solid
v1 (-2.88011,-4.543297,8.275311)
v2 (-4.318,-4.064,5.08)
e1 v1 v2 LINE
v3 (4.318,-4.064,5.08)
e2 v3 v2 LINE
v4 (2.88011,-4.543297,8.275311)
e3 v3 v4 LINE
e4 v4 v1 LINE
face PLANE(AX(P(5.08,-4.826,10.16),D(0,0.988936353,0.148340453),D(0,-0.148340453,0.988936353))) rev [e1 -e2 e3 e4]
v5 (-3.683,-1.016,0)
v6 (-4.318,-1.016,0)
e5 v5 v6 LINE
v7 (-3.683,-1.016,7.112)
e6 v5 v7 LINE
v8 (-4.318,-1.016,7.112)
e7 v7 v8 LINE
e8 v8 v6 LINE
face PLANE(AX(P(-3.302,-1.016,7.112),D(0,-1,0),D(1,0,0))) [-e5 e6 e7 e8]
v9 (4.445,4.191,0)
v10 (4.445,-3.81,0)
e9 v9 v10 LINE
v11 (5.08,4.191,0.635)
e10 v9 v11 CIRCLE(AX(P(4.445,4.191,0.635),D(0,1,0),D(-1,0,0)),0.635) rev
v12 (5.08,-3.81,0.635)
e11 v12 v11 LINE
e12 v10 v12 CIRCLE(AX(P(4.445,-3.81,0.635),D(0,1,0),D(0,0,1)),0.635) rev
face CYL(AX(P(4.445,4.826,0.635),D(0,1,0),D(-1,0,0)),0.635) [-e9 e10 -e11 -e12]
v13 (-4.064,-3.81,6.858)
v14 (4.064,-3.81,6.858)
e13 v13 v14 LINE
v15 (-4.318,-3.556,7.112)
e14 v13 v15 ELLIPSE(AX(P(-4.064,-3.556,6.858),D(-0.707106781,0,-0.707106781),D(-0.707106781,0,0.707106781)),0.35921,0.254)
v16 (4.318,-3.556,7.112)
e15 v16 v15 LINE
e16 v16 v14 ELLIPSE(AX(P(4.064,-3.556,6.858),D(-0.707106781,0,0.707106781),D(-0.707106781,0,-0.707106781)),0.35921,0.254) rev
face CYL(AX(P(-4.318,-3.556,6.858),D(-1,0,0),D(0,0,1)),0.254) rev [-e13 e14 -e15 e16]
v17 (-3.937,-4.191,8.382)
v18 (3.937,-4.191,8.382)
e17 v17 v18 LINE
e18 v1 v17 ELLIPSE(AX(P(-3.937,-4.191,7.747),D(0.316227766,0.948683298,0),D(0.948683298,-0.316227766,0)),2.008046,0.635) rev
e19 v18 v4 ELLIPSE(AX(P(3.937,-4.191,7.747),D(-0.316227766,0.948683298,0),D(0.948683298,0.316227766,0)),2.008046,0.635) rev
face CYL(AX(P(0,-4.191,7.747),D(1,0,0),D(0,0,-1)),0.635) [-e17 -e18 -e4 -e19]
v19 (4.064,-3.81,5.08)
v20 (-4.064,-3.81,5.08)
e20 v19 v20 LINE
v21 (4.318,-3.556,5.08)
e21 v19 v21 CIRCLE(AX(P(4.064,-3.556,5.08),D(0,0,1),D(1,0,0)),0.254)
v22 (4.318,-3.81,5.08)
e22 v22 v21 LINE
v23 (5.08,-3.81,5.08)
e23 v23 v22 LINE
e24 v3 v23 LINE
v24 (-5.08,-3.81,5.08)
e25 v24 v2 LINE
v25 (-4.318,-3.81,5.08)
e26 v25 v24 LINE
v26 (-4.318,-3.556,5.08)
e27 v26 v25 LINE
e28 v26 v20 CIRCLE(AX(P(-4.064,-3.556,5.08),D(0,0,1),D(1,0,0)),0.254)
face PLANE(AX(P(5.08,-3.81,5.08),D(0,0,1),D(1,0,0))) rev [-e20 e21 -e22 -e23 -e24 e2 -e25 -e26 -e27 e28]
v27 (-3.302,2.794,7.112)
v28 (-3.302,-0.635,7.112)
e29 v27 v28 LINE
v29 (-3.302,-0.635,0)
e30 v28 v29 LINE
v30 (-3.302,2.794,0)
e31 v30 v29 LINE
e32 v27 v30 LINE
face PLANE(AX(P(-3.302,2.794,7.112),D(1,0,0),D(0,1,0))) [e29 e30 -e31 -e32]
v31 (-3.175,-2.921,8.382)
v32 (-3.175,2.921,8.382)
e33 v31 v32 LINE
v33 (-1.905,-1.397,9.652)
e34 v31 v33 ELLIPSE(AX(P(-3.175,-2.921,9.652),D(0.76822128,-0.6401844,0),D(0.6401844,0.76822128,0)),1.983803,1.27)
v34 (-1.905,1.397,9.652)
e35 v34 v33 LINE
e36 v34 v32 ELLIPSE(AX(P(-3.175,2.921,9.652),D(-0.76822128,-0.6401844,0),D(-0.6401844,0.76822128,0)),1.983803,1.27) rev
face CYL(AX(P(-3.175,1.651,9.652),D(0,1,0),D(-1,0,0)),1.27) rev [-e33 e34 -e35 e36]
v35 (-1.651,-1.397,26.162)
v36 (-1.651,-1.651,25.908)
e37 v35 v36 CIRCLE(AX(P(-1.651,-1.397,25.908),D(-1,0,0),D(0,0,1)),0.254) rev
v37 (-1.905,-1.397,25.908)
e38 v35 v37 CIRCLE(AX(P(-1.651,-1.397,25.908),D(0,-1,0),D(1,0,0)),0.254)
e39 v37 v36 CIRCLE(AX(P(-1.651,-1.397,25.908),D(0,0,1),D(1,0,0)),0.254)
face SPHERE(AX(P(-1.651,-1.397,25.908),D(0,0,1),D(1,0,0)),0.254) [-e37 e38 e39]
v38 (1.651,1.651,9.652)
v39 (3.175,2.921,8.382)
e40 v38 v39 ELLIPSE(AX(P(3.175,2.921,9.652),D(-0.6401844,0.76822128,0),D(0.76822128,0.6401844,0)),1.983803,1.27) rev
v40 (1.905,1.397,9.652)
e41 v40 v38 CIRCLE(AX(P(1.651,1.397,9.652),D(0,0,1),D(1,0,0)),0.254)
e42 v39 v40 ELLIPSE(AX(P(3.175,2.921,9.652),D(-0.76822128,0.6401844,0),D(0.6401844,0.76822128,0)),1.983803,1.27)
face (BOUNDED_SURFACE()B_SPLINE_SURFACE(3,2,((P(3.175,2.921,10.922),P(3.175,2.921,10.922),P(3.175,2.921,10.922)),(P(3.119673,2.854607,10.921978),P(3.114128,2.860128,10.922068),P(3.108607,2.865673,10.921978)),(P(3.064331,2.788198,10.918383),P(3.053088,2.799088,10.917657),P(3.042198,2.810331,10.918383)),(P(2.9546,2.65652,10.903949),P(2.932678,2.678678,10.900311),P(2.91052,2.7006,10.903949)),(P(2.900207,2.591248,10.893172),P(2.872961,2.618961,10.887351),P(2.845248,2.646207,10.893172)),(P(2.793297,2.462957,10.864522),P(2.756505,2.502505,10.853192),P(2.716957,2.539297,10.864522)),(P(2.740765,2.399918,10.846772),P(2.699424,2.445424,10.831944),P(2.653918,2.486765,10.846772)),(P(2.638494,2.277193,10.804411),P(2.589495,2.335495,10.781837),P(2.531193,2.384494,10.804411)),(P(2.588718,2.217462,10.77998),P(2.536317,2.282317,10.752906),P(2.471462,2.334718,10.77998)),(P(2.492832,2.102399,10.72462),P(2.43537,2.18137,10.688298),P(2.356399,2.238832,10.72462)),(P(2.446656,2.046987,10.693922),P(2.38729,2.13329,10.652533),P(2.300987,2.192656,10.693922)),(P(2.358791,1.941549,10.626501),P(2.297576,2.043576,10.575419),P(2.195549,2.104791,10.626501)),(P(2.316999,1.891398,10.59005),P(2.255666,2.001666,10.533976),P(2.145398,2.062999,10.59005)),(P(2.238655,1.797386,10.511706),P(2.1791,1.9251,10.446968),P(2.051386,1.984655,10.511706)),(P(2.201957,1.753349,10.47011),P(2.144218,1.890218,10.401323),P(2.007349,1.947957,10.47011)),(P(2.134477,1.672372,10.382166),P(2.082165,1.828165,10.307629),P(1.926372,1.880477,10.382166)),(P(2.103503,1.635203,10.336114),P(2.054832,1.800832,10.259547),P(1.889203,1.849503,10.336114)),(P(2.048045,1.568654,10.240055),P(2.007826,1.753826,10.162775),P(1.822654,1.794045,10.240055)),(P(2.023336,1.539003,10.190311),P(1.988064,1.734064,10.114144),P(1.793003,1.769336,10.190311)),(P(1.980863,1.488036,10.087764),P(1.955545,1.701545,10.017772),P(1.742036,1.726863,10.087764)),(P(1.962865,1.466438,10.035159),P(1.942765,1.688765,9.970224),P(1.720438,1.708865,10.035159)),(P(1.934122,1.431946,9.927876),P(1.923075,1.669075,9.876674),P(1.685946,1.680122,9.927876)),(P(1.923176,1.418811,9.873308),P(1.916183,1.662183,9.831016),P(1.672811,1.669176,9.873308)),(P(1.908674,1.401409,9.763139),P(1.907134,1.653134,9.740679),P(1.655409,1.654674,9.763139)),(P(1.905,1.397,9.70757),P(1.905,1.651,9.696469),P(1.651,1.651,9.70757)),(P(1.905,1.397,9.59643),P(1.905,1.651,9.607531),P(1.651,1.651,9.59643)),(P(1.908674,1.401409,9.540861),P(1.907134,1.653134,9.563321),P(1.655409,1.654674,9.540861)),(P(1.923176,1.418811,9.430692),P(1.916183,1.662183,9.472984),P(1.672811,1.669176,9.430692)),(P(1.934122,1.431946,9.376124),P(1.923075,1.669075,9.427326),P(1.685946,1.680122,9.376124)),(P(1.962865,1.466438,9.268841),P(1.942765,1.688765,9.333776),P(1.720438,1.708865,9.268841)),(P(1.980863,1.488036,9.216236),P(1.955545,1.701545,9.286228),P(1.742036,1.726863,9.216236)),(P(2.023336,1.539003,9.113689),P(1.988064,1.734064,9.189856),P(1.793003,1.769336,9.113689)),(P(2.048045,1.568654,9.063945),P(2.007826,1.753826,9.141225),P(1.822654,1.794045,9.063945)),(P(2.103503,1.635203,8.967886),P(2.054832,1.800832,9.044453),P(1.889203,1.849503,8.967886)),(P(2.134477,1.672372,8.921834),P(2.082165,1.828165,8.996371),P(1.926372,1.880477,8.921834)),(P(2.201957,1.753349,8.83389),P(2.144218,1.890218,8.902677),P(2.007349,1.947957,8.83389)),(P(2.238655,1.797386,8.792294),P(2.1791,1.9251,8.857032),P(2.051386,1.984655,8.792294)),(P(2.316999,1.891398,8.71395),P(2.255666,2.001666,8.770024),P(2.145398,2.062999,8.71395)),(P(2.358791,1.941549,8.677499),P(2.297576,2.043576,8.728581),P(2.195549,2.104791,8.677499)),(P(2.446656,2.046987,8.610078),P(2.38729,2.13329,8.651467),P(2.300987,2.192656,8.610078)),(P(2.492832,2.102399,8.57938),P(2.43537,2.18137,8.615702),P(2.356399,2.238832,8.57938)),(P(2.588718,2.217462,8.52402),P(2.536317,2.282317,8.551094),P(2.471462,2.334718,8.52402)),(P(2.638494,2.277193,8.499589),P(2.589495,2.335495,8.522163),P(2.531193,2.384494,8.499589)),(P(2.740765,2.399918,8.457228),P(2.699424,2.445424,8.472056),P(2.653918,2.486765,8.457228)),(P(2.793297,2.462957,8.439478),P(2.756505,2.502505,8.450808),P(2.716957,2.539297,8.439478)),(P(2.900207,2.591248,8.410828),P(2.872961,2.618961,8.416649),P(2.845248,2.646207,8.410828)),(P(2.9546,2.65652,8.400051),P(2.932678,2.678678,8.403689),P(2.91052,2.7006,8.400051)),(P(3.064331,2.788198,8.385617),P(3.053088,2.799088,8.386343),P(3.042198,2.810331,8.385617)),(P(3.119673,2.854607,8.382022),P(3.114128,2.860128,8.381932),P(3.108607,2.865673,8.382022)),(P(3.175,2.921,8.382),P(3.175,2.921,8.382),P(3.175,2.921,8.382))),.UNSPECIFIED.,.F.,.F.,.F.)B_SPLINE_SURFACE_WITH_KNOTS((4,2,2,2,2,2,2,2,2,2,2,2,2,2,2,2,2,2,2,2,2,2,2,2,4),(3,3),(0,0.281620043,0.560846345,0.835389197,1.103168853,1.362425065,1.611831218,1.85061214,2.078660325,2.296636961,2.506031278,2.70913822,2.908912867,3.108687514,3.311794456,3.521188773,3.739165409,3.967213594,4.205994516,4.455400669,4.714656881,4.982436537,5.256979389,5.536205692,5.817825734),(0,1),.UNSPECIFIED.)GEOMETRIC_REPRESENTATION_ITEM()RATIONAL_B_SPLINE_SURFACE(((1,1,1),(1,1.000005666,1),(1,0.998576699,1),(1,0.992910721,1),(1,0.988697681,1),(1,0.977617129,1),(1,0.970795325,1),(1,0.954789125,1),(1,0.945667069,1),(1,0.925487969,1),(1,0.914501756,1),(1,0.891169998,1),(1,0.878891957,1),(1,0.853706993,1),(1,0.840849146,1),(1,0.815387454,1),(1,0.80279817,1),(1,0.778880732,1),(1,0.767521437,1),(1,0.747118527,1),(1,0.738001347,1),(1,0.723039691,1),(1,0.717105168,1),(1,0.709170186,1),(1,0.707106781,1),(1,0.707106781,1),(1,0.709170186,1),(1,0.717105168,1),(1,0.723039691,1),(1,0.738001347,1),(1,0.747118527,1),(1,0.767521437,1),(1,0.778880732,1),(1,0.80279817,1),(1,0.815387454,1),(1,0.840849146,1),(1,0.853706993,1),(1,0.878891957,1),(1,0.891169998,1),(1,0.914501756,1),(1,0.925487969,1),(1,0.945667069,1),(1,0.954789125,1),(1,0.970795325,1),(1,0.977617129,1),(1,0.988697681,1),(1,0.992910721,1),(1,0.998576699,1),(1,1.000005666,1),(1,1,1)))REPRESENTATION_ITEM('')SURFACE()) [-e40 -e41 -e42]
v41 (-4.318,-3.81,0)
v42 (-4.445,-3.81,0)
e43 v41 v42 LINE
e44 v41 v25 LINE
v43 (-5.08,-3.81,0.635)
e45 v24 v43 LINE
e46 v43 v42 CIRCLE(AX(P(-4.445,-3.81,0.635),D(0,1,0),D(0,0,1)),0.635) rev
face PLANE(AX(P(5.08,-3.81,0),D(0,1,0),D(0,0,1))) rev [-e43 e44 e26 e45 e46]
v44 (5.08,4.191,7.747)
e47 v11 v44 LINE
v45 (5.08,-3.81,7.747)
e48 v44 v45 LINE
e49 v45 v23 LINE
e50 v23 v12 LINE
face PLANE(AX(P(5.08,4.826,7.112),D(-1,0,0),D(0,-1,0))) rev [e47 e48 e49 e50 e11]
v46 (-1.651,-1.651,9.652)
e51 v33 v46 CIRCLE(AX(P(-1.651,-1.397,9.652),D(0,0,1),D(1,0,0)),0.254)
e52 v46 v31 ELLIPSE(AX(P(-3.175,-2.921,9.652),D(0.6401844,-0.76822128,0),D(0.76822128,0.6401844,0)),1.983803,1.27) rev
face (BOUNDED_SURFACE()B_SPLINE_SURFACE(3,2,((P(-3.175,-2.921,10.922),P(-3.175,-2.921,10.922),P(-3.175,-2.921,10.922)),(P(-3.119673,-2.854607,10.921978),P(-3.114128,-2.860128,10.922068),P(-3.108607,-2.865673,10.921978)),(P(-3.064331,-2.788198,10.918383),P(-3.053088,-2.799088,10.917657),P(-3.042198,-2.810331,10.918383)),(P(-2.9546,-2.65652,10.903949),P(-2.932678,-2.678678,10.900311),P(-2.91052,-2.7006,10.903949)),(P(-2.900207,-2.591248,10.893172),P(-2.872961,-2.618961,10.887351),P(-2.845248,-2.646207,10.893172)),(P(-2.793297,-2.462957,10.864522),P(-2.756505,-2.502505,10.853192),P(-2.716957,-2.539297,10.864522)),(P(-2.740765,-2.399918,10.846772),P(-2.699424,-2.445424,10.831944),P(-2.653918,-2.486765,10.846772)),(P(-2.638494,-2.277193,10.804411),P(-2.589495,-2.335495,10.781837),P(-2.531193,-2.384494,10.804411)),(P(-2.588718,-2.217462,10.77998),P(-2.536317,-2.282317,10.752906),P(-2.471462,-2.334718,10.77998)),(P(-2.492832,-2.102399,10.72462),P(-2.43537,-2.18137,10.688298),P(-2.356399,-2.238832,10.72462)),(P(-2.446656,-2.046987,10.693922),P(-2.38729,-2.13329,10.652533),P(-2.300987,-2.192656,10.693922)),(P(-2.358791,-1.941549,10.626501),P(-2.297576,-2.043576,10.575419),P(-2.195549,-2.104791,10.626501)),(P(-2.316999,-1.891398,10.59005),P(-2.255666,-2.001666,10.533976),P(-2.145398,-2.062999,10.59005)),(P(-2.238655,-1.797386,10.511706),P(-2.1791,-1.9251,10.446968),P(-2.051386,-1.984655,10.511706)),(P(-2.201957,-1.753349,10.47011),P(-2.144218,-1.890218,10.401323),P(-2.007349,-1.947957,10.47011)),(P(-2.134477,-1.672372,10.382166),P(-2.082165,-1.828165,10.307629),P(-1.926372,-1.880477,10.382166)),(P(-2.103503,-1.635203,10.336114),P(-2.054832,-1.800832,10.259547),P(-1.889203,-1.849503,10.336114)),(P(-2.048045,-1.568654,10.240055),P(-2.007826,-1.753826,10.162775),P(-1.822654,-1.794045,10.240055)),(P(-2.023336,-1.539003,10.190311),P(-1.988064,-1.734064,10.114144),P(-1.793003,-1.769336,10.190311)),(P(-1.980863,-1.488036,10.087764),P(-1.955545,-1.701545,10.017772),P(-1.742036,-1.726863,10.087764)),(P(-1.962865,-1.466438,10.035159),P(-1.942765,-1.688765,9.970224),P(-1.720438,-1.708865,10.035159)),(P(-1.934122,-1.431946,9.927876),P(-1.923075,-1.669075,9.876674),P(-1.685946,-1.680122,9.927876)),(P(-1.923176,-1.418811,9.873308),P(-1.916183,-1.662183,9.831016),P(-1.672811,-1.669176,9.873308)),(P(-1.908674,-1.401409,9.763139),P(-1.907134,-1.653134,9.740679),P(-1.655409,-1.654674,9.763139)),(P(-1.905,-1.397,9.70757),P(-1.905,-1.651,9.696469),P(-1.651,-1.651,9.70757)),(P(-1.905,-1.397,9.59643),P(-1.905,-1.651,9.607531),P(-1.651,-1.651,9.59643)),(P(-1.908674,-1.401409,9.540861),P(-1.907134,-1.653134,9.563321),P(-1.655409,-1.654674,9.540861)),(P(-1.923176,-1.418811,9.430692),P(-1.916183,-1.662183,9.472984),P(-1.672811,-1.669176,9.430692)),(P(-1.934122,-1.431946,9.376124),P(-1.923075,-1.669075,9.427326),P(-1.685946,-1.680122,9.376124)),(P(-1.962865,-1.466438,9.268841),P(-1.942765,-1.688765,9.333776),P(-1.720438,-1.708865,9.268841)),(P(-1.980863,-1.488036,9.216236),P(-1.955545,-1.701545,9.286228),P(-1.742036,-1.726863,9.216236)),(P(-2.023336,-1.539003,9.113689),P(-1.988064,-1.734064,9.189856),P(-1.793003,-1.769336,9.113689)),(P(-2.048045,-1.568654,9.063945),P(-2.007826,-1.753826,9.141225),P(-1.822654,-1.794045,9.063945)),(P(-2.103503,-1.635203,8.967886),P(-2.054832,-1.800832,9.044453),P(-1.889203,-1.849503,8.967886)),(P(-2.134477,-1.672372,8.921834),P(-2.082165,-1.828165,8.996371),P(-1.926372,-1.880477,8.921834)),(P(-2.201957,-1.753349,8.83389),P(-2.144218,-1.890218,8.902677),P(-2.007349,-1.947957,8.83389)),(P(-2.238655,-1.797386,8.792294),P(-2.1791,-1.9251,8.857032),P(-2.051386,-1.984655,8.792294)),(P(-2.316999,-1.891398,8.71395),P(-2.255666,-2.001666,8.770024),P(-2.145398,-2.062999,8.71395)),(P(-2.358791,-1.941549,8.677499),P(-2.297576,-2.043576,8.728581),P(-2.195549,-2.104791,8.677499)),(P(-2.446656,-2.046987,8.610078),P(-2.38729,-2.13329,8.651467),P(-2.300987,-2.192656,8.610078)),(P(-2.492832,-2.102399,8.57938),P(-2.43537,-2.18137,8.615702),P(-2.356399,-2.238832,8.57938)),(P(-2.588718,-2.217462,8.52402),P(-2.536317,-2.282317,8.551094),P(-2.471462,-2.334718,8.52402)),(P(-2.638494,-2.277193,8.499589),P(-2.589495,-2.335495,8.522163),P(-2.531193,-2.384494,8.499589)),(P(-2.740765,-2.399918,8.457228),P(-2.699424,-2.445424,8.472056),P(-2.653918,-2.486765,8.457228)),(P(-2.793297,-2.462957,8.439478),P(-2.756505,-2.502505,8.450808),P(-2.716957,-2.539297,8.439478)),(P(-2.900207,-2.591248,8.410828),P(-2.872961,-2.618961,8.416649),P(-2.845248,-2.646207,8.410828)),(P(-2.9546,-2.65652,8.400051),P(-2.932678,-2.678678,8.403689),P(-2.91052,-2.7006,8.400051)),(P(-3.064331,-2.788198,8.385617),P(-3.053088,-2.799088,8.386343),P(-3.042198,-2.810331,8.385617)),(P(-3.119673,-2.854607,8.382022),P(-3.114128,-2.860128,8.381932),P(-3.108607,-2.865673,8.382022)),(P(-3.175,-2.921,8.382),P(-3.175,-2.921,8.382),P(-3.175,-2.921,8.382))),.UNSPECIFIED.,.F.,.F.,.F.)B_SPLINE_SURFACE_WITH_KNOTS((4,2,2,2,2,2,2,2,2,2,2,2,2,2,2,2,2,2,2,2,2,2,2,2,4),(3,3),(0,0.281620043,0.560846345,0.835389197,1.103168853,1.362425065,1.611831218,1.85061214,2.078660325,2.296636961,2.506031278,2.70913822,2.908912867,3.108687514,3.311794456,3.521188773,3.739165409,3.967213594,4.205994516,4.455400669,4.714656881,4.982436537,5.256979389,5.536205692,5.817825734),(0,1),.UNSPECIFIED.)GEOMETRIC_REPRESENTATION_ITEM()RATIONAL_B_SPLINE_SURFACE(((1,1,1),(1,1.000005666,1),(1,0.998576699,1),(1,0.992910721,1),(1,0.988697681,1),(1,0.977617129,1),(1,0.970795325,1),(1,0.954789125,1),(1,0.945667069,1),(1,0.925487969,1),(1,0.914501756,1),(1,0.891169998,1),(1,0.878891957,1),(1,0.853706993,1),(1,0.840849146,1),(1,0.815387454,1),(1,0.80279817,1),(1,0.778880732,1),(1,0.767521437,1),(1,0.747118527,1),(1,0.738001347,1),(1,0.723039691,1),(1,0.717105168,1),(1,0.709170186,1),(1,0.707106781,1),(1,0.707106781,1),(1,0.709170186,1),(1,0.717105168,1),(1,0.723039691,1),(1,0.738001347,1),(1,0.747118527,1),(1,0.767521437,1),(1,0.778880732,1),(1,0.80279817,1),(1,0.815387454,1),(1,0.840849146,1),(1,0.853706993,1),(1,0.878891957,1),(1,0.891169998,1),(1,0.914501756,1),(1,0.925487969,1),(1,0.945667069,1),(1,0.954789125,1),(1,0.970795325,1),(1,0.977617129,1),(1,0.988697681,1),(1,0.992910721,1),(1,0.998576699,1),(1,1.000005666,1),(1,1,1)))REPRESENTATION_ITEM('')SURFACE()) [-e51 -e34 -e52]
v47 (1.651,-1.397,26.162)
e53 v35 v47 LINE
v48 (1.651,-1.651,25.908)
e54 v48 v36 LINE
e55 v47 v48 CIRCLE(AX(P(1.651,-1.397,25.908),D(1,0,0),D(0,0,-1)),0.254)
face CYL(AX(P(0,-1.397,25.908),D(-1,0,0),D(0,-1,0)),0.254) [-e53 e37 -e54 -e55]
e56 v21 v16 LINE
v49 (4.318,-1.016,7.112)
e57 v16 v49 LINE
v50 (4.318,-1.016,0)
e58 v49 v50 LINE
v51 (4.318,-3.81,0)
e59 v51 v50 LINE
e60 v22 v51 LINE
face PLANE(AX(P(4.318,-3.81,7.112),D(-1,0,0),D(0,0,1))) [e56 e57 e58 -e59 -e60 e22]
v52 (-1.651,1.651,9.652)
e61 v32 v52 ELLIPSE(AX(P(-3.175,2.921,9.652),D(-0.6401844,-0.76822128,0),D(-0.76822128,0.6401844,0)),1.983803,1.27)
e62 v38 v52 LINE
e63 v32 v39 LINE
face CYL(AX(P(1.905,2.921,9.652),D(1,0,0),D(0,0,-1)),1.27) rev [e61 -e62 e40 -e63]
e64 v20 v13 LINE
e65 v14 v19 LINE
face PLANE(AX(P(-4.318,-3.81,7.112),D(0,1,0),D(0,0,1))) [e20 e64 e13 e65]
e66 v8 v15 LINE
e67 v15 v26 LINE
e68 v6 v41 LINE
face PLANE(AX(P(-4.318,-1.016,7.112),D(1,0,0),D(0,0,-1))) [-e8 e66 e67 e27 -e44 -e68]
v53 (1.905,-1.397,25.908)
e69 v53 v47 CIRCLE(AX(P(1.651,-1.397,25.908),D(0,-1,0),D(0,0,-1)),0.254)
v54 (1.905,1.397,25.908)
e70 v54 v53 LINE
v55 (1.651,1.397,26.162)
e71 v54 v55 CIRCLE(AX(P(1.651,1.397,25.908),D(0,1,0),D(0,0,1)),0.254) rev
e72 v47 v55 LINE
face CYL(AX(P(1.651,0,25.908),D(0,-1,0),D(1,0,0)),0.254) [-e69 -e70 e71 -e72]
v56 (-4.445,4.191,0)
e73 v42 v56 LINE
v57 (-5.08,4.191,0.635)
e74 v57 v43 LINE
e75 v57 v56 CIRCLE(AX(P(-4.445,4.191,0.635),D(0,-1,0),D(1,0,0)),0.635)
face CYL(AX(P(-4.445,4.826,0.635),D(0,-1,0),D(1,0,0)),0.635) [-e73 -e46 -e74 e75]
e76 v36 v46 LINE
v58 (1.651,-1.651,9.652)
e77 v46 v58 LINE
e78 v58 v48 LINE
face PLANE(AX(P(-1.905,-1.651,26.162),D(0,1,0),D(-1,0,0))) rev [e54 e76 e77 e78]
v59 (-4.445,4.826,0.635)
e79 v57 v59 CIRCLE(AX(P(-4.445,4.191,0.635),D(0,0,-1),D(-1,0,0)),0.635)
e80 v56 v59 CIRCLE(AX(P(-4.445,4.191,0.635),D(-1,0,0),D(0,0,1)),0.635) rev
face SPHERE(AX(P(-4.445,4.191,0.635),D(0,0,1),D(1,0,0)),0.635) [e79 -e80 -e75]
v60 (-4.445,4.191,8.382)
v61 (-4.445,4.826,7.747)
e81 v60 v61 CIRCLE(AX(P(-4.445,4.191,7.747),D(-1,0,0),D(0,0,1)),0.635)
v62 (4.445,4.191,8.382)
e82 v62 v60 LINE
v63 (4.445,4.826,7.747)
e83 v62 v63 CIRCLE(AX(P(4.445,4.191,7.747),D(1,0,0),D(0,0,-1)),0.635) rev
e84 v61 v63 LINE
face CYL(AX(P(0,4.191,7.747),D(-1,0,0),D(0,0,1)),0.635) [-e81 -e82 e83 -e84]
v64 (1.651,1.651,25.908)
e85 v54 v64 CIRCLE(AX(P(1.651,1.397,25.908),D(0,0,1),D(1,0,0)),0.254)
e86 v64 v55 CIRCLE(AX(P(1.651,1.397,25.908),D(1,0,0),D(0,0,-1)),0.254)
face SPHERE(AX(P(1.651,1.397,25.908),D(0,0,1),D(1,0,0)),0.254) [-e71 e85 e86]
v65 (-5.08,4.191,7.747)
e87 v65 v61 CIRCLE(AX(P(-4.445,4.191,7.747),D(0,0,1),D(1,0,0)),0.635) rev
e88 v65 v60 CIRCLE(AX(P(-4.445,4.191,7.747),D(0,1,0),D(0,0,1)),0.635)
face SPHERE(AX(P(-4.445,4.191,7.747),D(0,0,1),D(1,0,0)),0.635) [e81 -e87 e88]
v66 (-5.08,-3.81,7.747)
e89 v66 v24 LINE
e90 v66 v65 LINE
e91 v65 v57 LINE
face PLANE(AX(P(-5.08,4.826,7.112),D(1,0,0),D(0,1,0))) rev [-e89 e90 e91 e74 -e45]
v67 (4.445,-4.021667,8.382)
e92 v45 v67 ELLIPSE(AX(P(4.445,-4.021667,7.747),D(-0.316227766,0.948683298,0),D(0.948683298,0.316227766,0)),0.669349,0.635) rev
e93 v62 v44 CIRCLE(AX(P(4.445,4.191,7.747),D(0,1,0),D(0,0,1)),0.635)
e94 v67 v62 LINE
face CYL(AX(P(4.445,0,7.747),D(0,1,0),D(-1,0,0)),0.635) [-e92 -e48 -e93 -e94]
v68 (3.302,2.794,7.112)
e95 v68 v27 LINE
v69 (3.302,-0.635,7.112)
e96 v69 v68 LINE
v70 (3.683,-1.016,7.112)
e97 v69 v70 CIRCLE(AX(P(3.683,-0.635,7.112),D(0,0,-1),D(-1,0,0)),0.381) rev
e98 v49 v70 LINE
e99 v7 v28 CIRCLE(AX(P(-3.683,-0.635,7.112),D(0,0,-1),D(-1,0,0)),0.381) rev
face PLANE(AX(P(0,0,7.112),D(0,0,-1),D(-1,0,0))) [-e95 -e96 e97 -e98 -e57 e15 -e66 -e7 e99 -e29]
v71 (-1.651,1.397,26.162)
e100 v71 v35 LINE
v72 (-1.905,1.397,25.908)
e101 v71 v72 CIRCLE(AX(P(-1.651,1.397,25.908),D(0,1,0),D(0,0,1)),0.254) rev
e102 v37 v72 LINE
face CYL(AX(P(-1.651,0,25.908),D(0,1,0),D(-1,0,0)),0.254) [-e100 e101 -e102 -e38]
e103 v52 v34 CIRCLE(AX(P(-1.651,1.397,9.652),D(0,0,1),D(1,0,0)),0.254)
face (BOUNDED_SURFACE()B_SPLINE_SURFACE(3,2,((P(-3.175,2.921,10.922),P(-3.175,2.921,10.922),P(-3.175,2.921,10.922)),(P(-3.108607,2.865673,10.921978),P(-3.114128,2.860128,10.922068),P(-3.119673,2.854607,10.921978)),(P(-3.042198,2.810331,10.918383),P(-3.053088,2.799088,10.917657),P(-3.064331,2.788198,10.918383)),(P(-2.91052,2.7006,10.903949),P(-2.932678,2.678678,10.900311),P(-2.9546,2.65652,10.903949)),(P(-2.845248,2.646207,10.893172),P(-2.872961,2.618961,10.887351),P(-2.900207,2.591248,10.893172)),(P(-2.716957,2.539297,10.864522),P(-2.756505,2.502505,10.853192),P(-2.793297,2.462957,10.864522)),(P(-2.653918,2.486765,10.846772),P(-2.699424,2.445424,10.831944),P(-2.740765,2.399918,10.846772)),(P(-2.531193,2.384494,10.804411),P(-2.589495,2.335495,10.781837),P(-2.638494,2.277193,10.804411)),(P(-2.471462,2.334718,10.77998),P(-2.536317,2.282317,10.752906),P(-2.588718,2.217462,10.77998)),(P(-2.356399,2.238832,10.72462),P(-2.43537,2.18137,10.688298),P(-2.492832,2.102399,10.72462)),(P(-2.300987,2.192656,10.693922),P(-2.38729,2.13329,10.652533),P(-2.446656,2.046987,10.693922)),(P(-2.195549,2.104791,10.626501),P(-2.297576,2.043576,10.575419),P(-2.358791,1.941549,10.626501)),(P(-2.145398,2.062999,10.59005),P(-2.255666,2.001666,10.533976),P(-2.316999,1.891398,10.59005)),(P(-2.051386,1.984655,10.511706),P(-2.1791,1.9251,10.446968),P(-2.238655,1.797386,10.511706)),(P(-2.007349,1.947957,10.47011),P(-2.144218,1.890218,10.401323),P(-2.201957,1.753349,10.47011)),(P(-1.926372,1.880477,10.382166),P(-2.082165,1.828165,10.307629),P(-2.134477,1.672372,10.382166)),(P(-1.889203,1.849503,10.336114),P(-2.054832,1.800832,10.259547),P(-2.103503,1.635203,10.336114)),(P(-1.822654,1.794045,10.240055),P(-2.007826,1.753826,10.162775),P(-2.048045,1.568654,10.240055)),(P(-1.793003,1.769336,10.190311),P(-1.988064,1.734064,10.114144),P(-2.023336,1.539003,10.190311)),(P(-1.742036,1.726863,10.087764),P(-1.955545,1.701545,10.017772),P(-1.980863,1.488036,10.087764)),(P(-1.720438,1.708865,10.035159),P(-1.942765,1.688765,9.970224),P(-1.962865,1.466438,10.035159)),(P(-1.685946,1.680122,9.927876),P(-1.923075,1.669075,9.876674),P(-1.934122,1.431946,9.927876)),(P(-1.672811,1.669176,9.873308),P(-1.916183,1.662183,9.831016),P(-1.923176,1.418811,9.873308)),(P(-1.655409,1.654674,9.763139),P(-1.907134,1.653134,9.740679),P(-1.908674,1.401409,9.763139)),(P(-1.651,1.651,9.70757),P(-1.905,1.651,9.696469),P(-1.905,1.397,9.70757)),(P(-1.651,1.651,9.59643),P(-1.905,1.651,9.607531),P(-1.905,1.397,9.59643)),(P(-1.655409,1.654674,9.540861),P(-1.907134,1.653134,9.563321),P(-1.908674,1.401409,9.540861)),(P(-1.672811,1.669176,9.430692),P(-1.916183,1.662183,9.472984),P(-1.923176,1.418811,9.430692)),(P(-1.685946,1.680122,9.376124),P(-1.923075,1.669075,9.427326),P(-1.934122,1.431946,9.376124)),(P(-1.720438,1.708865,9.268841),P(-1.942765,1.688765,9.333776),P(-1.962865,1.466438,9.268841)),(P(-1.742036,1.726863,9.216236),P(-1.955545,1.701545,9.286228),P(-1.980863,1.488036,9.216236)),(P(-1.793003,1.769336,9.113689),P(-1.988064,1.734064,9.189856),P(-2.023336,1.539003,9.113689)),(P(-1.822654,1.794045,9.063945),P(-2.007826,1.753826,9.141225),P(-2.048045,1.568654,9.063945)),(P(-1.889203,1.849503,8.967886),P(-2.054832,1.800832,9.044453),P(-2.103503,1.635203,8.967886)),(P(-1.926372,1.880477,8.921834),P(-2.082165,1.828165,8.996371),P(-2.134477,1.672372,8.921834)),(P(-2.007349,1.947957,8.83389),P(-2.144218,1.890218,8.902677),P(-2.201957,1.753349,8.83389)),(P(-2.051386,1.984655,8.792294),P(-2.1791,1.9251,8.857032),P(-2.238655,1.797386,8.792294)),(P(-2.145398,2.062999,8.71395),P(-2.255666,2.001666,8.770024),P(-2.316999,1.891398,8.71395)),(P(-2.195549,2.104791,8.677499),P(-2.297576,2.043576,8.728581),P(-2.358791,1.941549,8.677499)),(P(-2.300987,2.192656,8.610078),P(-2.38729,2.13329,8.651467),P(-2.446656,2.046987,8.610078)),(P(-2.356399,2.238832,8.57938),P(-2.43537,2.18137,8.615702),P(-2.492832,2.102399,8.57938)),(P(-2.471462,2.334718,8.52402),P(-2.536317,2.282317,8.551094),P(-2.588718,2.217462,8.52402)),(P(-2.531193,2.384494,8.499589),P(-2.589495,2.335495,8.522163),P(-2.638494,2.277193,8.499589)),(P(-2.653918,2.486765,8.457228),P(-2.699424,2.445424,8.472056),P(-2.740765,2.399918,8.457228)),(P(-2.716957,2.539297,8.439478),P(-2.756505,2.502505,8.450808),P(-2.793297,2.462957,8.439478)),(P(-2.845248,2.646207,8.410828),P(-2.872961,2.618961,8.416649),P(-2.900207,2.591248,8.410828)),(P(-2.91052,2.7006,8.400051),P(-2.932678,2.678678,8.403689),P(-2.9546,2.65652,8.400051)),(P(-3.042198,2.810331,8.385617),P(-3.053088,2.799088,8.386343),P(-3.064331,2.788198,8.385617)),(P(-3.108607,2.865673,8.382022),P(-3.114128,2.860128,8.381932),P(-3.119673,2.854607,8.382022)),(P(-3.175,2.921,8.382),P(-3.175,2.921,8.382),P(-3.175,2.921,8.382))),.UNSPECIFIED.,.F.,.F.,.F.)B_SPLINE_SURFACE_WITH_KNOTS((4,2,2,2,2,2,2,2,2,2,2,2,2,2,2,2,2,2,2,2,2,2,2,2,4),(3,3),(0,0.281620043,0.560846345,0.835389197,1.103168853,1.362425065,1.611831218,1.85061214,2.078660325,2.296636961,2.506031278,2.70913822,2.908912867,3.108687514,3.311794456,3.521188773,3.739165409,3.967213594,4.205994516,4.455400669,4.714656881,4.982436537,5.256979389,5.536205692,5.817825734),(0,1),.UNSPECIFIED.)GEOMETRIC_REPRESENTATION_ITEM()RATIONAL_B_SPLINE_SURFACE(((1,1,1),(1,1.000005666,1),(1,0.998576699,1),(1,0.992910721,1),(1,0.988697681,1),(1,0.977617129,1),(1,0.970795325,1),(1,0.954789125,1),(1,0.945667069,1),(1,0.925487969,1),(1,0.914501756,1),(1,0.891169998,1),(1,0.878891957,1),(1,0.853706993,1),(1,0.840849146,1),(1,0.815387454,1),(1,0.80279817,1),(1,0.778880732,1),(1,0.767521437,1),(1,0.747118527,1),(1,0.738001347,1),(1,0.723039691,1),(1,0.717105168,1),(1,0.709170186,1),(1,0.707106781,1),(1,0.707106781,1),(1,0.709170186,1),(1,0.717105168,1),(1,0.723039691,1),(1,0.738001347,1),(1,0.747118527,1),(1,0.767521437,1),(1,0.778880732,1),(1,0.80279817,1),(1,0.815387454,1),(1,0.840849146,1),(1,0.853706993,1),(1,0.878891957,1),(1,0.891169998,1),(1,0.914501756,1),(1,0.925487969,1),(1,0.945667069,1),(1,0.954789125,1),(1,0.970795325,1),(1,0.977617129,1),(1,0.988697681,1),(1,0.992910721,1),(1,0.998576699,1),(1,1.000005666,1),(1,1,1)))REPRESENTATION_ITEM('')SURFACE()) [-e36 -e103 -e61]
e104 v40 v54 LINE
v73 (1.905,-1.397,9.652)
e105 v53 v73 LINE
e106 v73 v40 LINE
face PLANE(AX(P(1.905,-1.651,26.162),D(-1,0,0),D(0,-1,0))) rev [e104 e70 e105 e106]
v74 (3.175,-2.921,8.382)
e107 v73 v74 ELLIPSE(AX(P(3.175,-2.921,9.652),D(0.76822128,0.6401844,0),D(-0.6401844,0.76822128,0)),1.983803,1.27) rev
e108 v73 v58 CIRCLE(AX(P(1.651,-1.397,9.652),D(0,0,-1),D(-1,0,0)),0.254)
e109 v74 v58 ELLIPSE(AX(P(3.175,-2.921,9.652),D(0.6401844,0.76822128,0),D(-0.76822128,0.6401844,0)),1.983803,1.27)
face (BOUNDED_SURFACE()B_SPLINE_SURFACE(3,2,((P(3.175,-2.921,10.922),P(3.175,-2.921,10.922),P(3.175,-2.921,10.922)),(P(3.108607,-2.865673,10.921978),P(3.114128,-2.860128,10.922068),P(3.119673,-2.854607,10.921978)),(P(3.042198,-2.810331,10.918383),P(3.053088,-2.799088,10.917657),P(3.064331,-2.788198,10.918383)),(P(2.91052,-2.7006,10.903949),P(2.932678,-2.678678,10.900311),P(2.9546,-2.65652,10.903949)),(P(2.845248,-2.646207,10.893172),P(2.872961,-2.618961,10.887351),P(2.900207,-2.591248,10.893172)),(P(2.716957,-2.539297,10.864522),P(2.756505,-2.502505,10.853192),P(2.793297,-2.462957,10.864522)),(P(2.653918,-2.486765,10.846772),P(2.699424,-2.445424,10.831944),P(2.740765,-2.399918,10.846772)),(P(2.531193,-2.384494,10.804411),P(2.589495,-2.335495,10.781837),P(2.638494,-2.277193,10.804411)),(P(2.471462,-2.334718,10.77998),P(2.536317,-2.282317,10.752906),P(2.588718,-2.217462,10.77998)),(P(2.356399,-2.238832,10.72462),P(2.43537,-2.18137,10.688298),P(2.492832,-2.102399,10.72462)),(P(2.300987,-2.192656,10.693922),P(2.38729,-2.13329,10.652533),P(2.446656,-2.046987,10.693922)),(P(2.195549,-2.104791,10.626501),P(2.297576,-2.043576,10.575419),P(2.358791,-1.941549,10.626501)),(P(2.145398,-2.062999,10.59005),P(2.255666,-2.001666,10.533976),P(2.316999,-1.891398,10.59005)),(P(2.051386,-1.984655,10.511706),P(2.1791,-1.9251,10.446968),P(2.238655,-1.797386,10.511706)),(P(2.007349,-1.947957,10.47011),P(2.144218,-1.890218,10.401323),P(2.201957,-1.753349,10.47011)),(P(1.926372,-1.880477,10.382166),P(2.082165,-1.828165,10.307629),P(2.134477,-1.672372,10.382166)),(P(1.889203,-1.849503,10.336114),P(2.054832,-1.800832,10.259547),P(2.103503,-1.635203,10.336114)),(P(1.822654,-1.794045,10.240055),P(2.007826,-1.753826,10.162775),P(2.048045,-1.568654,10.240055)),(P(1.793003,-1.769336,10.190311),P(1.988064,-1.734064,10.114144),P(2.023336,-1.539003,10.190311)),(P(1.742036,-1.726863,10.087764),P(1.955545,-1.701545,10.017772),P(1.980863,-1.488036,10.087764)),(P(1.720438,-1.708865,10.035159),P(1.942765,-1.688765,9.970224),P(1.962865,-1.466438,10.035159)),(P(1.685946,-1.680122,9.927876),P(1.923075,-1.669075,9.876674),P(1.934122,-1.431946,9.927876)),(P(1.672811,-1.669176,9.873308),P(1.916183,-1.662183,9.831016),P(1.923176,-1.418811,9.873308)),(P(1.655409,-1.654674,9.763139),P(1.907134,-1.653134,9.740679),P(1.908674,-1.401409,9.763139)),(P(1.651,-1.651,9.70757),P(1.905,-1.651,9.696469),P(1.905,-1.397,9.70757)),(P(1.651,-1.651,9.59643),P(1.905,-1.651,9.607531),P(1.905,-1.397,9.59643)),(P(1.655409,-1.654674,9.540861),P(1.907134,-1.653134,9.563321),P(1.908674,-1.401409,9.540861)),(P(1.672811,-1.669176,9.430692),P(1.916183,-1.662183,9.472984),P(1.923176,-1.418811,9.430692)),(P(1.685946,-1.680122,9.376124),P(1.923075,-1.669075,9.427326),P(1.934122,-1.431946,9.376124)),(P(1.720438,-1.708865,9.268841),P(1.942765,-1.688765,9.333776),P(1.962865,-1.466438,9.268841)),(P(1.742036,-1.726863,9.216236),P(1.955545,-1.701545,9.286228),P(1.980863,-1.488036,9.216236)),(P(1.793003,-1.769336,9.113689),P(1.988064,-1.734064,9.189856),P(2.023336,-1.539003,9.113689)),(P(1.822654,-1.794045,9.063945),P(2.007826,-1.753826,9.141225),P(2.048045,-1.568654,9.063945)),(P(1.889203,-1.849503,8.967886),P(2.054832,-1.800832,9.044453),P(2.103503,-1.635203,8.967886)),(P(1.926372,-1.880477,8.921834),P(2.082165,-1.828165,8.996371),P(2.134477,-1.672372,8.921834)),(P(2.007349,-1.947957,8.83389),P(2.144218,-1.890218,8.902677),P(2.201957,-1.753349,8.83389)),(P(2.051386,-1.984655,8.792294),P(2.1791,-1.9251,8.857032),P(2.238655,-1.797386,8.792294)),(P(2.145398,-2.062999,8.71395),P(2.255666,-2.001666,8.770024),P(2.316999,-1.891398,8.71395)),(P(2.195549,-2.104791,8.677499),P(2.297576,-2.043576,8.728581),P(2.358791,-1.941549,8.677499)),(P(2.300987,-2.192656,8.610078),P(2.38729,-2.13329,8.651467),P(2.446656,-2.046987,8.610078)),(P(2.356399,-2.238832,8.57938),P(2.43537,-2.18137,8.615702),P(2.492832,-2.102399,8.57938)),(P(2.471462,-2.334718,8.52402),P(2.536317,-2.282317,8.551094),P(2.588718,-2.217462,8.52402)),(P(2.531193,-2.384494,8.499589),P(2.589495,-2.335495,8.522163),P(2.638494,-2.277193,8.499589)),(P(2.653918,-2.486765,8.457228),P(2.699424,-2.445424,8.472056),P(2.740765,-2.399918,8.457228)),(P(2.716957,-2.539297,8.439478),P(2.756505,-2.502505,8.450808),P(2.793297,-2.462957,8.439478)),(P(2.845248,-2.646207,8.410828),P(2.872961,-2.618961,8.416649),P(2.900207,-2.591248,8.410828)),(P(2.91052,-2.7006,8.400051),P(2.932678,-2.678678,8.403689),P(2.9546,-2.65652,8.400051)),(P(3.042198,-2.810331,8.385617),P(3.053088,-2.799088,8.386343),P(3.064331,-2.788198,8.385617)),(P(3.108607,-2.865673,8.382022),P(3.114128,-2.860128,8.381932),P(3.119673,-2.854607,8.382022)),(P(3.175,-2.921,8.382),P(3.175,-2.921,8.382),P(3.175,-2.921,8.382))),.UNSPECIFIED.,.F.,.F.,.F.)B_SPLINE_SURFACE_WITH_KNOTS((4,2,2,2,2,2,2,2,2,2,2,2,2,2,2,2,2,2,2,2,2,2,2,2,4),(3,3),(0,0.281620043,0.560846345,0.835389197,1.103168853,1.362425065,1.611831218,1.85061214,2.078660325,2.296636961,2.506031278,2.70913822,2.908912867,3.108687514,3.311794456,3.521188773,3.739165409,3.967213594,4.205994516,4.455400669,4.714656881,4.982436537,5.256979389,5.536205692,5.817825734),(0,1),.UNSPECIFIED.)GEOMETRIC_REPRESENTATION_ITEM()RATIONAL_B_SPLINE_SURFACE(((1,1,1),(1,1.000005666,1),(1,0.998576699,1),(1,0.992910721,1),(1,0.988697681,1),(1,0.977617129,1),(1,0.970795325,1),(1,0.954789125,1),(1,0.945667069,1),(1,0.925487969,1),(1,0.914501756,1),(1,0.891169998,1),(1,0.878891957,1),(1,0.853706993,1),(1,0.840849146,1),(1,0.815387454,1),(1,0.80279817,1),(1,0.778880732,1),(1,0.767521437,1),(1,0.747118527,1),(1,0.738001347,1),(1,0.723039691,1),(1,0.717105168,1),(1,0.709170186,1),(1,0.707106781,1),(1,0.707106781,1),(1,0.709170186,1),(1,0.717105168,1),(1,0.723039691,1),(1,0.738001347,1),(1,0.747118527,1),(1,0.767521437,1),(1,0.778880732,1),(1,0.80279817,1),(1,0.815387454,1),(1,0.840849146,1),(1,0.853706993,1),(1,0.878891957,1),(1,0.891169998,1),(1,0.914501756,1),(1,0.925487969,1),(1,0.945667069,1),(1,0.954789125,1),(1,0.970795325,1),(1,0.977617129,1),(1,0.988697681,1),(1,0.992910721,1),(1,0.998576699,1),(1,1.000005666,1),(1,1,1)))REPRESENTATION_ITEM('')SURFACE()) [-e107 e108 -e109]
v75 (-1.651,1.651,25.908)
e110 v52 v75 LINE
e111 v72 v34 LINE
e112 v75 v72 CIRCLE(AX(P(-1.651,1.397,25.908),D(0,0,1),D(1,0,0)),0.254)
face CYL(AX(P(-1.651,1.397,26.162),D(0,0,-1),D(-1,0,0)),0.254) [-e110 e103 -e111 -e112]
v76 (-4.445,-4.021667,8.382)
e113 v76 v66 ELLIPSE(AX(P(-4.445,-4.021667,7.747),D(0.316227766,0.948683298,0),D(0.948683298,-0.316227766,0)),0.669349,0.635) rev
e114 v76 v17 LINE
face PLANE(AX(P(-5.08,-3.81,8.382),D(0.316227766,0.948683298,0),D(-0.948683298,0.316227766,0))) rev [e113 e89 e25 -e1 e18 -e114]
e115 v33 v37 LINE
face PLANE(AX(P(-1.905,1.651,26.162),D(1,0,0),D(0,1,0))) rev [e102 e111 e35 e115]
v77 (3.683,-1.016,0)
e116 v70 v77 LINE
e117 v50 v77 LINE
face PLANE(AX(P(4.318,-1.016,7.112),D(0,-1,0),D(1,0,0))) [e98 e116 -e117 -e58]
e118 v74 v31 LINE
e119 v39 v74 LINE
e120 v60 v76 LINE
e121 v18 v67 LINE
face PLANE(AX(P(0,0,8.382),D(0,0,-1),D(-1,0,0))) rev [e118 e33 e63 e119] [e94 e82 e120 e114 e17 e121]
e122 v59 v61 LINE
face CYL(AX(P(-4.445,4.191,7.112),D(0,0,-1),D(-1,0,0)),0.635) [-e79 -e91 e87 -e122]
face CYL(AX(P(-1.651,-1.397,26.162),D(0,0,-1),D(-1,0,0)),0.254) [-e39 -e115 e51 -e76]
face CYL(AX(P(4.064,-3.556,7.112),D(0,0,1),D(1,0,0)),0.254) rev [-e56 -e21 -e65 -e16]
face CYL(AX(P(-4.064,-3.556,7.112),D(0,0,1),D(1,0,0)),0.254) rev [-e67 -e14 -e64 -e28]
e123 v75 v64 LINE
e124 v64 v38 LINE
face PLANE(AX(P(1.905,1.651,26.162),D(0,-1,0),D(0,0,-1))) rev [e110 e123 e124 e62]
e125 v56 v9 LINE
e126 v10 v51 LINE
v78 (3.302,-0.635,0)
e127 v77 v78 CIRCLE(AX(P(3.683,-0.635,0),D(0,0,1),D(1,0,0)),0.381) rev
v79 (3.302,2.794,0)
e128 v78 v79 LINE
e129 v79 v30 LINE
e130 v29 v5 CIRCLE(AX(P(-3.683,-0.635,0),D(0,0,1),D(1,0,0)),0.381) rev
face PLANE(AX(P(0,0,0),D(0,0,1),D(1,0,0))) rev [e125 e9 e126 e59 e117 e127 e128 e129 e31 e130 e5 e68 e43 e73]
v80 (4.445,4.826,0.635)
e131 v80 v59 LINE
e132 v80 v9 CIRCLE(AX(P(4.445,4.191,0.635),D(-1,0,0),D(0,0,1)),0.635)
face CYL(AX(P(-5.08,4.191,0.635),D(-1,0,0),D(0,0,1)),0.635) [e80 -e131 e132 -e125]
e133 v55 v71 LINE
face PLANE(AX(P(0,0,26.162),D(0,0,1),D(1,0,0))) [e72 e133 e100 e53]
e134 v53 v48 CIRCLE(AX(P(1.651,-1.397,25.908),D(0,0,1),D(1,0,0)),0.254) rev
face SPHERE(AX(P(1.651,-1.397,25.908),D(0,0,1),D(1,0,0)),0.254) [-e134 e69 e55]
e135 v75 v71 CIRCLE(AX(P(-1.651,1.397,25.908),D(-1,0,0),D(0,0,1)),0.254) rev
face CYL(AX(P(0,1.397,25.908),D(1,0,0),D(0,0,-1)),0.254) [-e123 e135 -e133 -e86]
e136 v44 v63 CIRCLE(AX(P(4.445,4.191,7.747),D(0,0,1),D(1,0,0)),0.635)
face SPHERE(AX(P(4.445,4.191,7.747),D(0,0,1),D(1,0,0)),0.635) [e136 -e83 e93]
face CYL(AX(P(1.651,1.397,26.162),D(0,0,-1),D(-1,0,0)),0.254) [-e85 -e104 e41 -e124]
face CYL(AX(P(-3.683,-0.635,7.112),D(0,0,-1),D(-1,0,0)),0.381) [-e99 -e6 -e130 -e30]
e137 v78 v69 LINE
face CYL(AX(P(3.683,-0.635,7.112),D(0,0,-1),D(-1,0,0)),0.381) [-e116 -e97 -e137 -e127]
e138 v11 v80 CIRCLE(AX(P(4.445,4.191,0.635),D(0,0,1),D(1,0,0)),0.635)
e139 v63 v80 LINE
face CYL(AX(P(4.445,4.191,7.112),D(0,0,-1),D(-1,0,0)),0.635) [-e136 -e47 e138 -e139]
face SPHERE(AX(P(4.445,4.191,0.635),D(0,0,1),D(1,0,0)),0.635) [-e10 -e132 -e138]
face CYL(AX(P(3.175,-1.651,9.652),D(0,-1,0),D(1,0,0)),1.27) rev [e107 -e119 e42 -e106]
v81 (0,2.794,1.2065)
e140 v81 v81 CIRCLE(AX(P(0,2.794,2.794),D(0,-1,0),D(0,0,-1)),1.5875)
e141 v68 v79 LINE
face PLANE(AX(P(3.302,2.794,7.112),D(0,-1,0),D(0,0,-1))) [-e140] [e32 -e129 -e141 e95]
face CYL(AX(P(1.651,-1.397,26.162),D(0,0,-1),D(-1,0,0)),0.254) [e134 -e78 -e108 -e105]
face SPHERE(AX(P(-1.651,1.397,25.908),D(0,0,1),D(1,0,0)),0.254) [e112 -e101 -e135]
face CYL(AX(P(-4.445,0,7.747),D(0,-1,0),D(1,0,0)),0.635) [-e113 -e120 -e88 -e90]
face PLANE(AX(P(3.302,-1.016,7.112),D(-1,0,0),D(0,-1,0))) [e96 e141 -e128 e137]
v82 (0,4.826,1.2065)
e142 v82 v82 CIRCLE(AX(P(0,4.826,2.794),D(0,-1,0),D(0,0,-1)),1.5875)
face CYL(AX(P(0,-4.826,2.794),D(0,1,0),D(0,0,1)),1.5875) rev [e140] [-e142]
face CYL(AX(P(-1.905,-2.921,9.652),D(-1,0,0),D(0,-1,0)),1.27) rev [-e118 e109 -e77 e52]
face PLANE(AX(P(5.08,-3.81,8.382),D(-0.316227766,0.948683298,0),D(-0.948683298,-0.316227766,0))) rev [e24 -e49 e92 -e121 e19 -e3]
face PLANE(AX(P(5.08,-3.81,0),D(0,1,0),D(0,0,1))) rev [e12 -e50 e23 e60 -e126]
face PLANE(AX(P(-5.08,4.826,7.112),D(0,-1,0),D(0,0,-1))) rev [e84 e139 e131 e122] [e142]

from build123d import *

# Parameters (mm, degrees)
SKETCH1_W               = 10.16
SKETCH1_H               = 9.652
BOSS_EXTRUDE1_DEPTH     = 7.112
CUT_EXTRUDE1_DEPTH      = 14.021061708
CUT_EXTRUDE1_DEPTH_BACK = 14.021061708
SKETCH2_R               = 1.5875
SKETCH7_W               = 10.16
SKETCH7_H               = 9.652
BOSS_EXTRUDE3_DEPTH     = 1.27
FILLET1_R               = 0.635
FILLET3_R               = 0.635
FILLET4_R               = 0.381
CUT_EXTRUDE3_DEPTH      = 14.485940976
CUT_EXTRUDE3_DEPTH_BACK = 14.485940976
FILLET9_R               = 0.254
CUT_EXTRUDE7_DEPTH      = 9.654656319
SKETCH14_W              = 3.81
SKETCH14_H              = 3.302
BOSS_EXTRUDE4_DEPTH     = 17.78
FILLET14_R              = 1.27
FILLET15_R              = 0.254


with BuildPart() as part:
    # Sketch1 → Boss-Extrude1 (new body)
    with BuildSketch(Plane.XY):
        Rectangle(SKETCH1_W, SKETCH1_H)
        Polygon((-4.318, -3.81), (4.318, -3.81), (4.318, -1.016), (3.302, -1.016), (3.302, 2.794), (-3.302, 2.794), (-3.302, -1.016), (-4.318, -1.016), align=None, mode=Mode.SUBTRACT)
    extrude(amount=BOSS_EXTRUDE1_DEPTH)

    # Sketch2 → Cut-Extrude1 (cut, two sides: drawn at the far end of the back side and taken through both)
    with BuildSketch(Plane(origin=(0, 4.826, 0), x_dir=(1, 0, 0), z_dir=(0, 1, 0)).offset(-CUT_EXTRUDE1_DEPTH_BACK)):
        with Locations(Location((0, -2.794, 0), (0, 0, 90))):
            Circle(SKETCH2_R)
    extrude(amount=CUT_EXTRUDE1_DEPTH + CUT_EXTRUDE1_DEPTH_BACK, mode=Mode.SUBTRACT)

    # Sketch7 → Boss-Extrude3 (add)
    with BuildSketch(Plane.XY.offset(7.112)):
        Rectangle(SKETCH7_W, SKETCH7_H)
    extrude(amount=BOSS_EXTRUDE3_DEPTH)

    # Fillet1
    fillet1_edges = [part.edges().sort_by_distance(p)[0] for p in [
        (-5.08, 0, 0),
        (0, 4.826, 0),
        (5.08, 0, 0),
    ]]
    fillet(fillet1_edges, radius=FILLET1_R)

    # Fillet3
    # the kernel refuses this fillet: 0.635 mm, written as the material it takes off along each edge
    with BuildSketch(Plane(origin=(4.445, 4.191, 0.635), x_dir=(1, 0, 0), z_dir=(0, 1, 0))) as fillet3_piece_1_section:
        Polygon((0, 0), (FILLET3_R, 0), (FILLET3_R, FILLET3_R), (0, FILLET3_R), align=None)
    fillet3_piece_1 = extrude(amount=FILLET3_R, mode=Mode.PRIVATE)
    fillet3_piece_1 = fillet3_piece_1 - Plane(origin=(4.445, 4.191, 0.635), x_dir=(-0.7071067811865475, 0, 0.7071067811865475), z_dir=(0, 1, 0)) * Sphere(FILLET3_R, mode=Mode.PRIVATE)
    add(fillet3_piece_1, mode=Mode.SUBTRACT)
    with BuildSketch(Plane(origin=(-4.445, 4.191, 0.635), x_dir=(-1, 0, 0), z_dir=(0, 1, 0))) as fillet3_piece_2_section:
        Polygon((0, 0), (FILLET3_R, 0), (FILLET3_R, -FILLET3_R), (0, -FILLET3_R), align=None)
    fillet3_piece_2 = extrude(amount=FILLET3_R, mode=Mode.PRIVATE)
    fillet3_piece_2 = fillet3_piece_2 - Plane(origin=(-4.445, 4.191, 0.635), x_dir=(0.7071067811865475, 0, 0.7071067811865475), z_dir=(0, 1, 0)) * Sphere(FILLET3_R, mode=Mode.PRIVATE)
    add(fillet3_piece_2, mode=Mode.SUBTRACT)
    with BuildSketch(Plane(origin=(-4.445, -4.191, 7.747), x_dir=(0, 0, 1), z_dir=(-1, 0, 0))) as fillet3_piece_3_section:
        Polygon((0, 0), (FILLET3_R, 0), (FILLET3_R, -FILLET3_R), (0, -FILLET3_R), align=None)
    fillet3_piece_3 = extrude(amount=FILLET3_R, mode=Mode.PRIVATE)
    fillet3_piece_3 = fillet3_piece_3 - Plane(origin=(-4.445, -4.191, 7.747), x_dir=(0, 0.7071067811865475, -0.7071067811865475), z_dir=(-1, 0, 0)) * Sphere(FILLET3_R, mode=Mode.PRIVATE)
    add(fillet3_piece_3, mode=Mode.SUBTRACT)
    with BuildSketch(Plane(origin=(-4.445, 4.191, 7.747), x_dir=(-1, 0, 0), z_dir=(0, 1, 0))) as fillet3_piece_4_section:
        Polygon((0, 0), (FILLET3_R, 0), (FILLET3_R, FILLET3_R), (0, FILLET3_R), align=None)
    fillet3_piece_4 = extrude(amount=FILLET3_R, mode=Mode.PRIVATE)
    fillet3_piece_4 = fillet3_piece_4 - Plane(origin=(-4.445, 4.191, 7.747), x_dir=(0.7071067811865475, 0, -0.7071067811865475), z_dir=(0, 1, 0)) * Sphere(FILLET3_R, mode=Mode.PRIVATE)
    add(fillet3_piece_4, mode=Mode.SUBTRACT)
    with BuildSketch(Plane(origin=(4.445, -4.191, 7.747), x_dir=(1, 0, 0), z_dir=(0, 0, 1))) as fillet3_piece_5_section:
        Polygon((0, 0), (FILLET3_R, 0), (FILLET3_R, -FILLET3_R), (0, -FILLET3_R), align=None)
    fillet3_piece_5 = extrude(amount=FILLET3_R, mode=Mode.PRIVATE)
    fillet3_piece_5 = fillet3_piece_5 - Plane(origin=(4.445, -4.191, 7.747), x_dir=(-0.7071067811865476, 0.7071067811865475, 0), z_dir=(0, 0, 1)) * Sphere(FILLET3_R, mode=Mode.PRIVATE)
    add(fillet3_piece_5, mode=Mode.SUBTRACT)
    with BuildSketch(Plane(origin=(4.445, 4.191, 7.747), x_dir=(0, 0, 1), z_dir=(0, 1, 0))) as fillet3_piece_6_section:
        Polygon((0, 0), (FILLET3_R, 0), (FILLET3_R, FILLET3_R), (0, FILLET3_R), align=None)
    fillet3_piece_6 = extrude(amount=FILLET3_R, mode=Mode.PRIVATE)
    fillet3_piece_6 = fillet3_piece_6 - Plane(origin=(4.445, 4.191, 7.747), x_dir=(-0.7071067811865475, 0, -0.7071067811865475), z_dir=(0, 1, 0)) * Sphere(FILLET3_R, mode=Mode.PRIVATE)
    add(fillet3_piece_6, mode=Mode.SUBTRACT)
    with BuildSketch(Plane(origin=(-5.08, -4.191, 8.382), x_dir=(0, 0, -1), z_dir=(0, 1, 0))) as fillet3_piece_7:
        with BuildLine():
            CenterArc((FILLET3_R, -FILLET3_R), FILLET3_R, 90, 90)
            Line((0, -FILLET3_R), (0, 0))
            Line((0, 0), (FILLET3_R, 0))
        make_face()
    extrude(amount=8.382, mode=Mode.SUBTRACT)
    with BuildSketch(Plane(origin=(4.445, -4.826, 8.382), x_dir=(0, 1, 0), z_dir=(-1, 0, 0)), Plane(origin=(4.445, -4.826, 0), x_dir=(0, 0, 1), z_dir=(-1, 0, 0))) as fillet3_piece_8:
        with BuildLine():
            CenterArc((FILLET3_R, FILLET3_R), FILLET3_R, 180, 90)
            Line((0, FILLET3_R), (0, 0))
            Line((0, 0), (FILLET3_R, 0))
        make_face()
    extrude(amount=8.89, mode=Mode.SUBTRACT)
    with BuildSketch(Plane(origin=(5.08, 4.191, 8.382), x_dir=(-1, 0, 0), z_dir=(0, -1, 0))) as fillet3_piece_9:
        with BuildLine():
            CenterArc((FILLET3_R, FILLET3_R), FILLET3_R, 180, 90)
            Line((0, FILLET3_R), (0, 0))
            Line((0, 0), (FILLET3_R, 0))
        make_face()
    extrude(amount=8.382, mode=Mode.SUBTRACT)
    with BuildSketch(Plane(origin=(-4.445, 4.826, 8.382), x_dir=(0, 0, -1), z_dir=(1, 0, 0))) as fillet3_piece_10:
        with BuildLine():
            CenterArc((FILLET3_R, -FILLET3_R), FILLET3_R, 90, 90)
            Line((0, -FILLET3_R), (0, 0))
            Line((0, 0), (FILLET3_R, 0))
        make_face()
    extrude(amount=8.89, mode=Mode.SUBTRACT)
    with BuildSketch(Plane(origin=(4.445, -4.826, 0.635), x_dir=(0, 0, -1), z_dir=(-1, 0, 0))) as fillet3_piece_11:
        with BuildLine():
            CenterArc((0.635 - FILLET3_R, -FILLET3_R), FILLET3_R, 0, 90)
            Line((0.635, -FILLET3_R), (0.635, 0))
            Line((0.635, 0), (0.635 - FILLET3_R, 0))
        make_face()
    revolve(axis=Axis((4.445, -4.826, 0.635), (0, -1, 0)), revolution_arc=90, mode=Mode.SUBTRACT)
    with BuildSketch(Plane(origin=(-4.445, -4.826, 0.635), x_dir=(0, 0, -1), z_dir=(1, 0, 0))) as fillet3_piece_12:
        with BuildLine():
            CenterArc((0.635 - FILLET3_R, FILLET3_R), FILLET3_R, 270, 90)
            Line((0.635, FILLET3_R), (0.635, 0))
            Line((0.635, 0), (0.635 - FILLET3_R, 0))
        make_face()
    revolve(axis=Axis((-4.445, -4.826, 0.635), (0, 1, 0)), revolution_arc=90, mode=Mode.SUBTRACT)
    with BuildSketch(Plane(origin=(5.08, -4.826, 7.747), x_dir=(0, 1, 0), z_dir=(0, 0, -1)), Plane(origin=(-5.08, -4.826, 0.635), x_dir=(0, 1, 0), z_dir=(0, 0, 1)), Plane(origin=(-5.08, 4.826, 0.635), x_dir=(1, 0, 0), z_dir=(0, 0, 1)), Plane(origin=(5.08, 4.826, 7.747), x_dir=(-1, 0, 0), z_dir=(0, 0, -1))) as fillet3_piece_13:
        with BuildLine():
            CenterArc((FILLET3_R, -FILLET3_R), FILLET3_R, 90, 90)
            Line((0, -FILLET3_R), (0, 0))
            Line((0, 0), (FILLET3_R, 0))
        make_face()
    extrude(amount=7.112, mode=Mode.SUBTRACT)

    # Fillet4
    fillet4_edges = [part.edges().sort_by_distance(p)[0] for p in [
        (3.302, -1.016, 3.556),
        (-3.302, -1.016, 3.556),
    ]]
    fillet(fillet4_edges, radius=FILLET4_R)

    # Sketch11 → Cut-Extrude3 (cut, two sides: drawn at the far end of the back side and taken through both)
    with BuildSketch(Plane.ZY.offset(-4.318).offset(-CUT_EXTRUDE3_DEPTH_BACK)):
        Polygon((0, -3.81), (5.08, -3.81), (5.08, -4.064), (10.16, -4.826), (0, -4.826), align=None)
    extrude(amount=CUT_EXTRUDE3_DEPTH + CUT_EXTRUDE3_DEPTH_BACK, mode=Mode.SUBTRACT)

    # Fillet9
    fillet9_edges = [part.edges().sort_by_distance(p)[0] for p in [
        (-4.318, -3.81, 6.096),
        (4.318, -3.81, 6.096),
        (0, -3.81, 7.112),
    ]]
    fillet(fillet9_edges, radius=FILLET9_R)

    # Sketch13 → Cut-Extrude7 (cut, through all)
    with BuildSketch(Plane(origin=(0, 0, 5.08), x_dir=(-1, 0, 0), z_dir=(0, 0, -1))):
        Polygon((-5.08, -3.81), (-5.08, -4.826), (-2.032, -4.826), align=None)
        Polygon((5.08, -3.81), (5.08, -4.826), (2.032, -4.826), align=None)
    extrude(amount=-CUT_EXTRUDE7_DEPTH, mode=Mode.SUBTRACT)

    # Sketch14 → Boss-Extrude4 (add)
    with BuildSketch(Plane.XY.offset(8.382)):
        Rectangle(SKETCH14_W, SKETCH14_H)
    extrude(amount=BOSS_EXTRUDE4_DEPTH)

    # Fillet14
    fillet14_edges = [part.edges().sort_by_distance(p)[0] for p in [
        (0, 1.651, 8.382),
        (-1.905, 0, 8.382),
        (0, -1.651, 8.382),
        (1.905, 0, 8.382),
    ]]
    fillet(fillet14_edges, radius=FILLET14_R)

    # Fillet15
    fillet15_edges = [part.edges().sort_by_distance(p)[0] for p in [
        (1.905, 1.651, 17.907),
        (-1.905, 1.651, 17.907),
        (-1.905, -1.651, 17.907),
        (1.905, -1.651, 17.907),
        (0, 1.651, 26.162),
        (-1.905, 0, 26.162),
        (0, -1.651, 26.162),
        (1.905, 0, 26.162),
        (2.354517888, 2.100517888, 8.682614059),
        (2.354517888, -2.100517888, 8.682614059),
        (-2.354517888, 2.100517888, 8.682614059),
        (-2.354517888, -2.100517888, 8.682614059),
    ]]
    fillet(fillet15_edges, radius=FILLET15_R)


solid = part.part
